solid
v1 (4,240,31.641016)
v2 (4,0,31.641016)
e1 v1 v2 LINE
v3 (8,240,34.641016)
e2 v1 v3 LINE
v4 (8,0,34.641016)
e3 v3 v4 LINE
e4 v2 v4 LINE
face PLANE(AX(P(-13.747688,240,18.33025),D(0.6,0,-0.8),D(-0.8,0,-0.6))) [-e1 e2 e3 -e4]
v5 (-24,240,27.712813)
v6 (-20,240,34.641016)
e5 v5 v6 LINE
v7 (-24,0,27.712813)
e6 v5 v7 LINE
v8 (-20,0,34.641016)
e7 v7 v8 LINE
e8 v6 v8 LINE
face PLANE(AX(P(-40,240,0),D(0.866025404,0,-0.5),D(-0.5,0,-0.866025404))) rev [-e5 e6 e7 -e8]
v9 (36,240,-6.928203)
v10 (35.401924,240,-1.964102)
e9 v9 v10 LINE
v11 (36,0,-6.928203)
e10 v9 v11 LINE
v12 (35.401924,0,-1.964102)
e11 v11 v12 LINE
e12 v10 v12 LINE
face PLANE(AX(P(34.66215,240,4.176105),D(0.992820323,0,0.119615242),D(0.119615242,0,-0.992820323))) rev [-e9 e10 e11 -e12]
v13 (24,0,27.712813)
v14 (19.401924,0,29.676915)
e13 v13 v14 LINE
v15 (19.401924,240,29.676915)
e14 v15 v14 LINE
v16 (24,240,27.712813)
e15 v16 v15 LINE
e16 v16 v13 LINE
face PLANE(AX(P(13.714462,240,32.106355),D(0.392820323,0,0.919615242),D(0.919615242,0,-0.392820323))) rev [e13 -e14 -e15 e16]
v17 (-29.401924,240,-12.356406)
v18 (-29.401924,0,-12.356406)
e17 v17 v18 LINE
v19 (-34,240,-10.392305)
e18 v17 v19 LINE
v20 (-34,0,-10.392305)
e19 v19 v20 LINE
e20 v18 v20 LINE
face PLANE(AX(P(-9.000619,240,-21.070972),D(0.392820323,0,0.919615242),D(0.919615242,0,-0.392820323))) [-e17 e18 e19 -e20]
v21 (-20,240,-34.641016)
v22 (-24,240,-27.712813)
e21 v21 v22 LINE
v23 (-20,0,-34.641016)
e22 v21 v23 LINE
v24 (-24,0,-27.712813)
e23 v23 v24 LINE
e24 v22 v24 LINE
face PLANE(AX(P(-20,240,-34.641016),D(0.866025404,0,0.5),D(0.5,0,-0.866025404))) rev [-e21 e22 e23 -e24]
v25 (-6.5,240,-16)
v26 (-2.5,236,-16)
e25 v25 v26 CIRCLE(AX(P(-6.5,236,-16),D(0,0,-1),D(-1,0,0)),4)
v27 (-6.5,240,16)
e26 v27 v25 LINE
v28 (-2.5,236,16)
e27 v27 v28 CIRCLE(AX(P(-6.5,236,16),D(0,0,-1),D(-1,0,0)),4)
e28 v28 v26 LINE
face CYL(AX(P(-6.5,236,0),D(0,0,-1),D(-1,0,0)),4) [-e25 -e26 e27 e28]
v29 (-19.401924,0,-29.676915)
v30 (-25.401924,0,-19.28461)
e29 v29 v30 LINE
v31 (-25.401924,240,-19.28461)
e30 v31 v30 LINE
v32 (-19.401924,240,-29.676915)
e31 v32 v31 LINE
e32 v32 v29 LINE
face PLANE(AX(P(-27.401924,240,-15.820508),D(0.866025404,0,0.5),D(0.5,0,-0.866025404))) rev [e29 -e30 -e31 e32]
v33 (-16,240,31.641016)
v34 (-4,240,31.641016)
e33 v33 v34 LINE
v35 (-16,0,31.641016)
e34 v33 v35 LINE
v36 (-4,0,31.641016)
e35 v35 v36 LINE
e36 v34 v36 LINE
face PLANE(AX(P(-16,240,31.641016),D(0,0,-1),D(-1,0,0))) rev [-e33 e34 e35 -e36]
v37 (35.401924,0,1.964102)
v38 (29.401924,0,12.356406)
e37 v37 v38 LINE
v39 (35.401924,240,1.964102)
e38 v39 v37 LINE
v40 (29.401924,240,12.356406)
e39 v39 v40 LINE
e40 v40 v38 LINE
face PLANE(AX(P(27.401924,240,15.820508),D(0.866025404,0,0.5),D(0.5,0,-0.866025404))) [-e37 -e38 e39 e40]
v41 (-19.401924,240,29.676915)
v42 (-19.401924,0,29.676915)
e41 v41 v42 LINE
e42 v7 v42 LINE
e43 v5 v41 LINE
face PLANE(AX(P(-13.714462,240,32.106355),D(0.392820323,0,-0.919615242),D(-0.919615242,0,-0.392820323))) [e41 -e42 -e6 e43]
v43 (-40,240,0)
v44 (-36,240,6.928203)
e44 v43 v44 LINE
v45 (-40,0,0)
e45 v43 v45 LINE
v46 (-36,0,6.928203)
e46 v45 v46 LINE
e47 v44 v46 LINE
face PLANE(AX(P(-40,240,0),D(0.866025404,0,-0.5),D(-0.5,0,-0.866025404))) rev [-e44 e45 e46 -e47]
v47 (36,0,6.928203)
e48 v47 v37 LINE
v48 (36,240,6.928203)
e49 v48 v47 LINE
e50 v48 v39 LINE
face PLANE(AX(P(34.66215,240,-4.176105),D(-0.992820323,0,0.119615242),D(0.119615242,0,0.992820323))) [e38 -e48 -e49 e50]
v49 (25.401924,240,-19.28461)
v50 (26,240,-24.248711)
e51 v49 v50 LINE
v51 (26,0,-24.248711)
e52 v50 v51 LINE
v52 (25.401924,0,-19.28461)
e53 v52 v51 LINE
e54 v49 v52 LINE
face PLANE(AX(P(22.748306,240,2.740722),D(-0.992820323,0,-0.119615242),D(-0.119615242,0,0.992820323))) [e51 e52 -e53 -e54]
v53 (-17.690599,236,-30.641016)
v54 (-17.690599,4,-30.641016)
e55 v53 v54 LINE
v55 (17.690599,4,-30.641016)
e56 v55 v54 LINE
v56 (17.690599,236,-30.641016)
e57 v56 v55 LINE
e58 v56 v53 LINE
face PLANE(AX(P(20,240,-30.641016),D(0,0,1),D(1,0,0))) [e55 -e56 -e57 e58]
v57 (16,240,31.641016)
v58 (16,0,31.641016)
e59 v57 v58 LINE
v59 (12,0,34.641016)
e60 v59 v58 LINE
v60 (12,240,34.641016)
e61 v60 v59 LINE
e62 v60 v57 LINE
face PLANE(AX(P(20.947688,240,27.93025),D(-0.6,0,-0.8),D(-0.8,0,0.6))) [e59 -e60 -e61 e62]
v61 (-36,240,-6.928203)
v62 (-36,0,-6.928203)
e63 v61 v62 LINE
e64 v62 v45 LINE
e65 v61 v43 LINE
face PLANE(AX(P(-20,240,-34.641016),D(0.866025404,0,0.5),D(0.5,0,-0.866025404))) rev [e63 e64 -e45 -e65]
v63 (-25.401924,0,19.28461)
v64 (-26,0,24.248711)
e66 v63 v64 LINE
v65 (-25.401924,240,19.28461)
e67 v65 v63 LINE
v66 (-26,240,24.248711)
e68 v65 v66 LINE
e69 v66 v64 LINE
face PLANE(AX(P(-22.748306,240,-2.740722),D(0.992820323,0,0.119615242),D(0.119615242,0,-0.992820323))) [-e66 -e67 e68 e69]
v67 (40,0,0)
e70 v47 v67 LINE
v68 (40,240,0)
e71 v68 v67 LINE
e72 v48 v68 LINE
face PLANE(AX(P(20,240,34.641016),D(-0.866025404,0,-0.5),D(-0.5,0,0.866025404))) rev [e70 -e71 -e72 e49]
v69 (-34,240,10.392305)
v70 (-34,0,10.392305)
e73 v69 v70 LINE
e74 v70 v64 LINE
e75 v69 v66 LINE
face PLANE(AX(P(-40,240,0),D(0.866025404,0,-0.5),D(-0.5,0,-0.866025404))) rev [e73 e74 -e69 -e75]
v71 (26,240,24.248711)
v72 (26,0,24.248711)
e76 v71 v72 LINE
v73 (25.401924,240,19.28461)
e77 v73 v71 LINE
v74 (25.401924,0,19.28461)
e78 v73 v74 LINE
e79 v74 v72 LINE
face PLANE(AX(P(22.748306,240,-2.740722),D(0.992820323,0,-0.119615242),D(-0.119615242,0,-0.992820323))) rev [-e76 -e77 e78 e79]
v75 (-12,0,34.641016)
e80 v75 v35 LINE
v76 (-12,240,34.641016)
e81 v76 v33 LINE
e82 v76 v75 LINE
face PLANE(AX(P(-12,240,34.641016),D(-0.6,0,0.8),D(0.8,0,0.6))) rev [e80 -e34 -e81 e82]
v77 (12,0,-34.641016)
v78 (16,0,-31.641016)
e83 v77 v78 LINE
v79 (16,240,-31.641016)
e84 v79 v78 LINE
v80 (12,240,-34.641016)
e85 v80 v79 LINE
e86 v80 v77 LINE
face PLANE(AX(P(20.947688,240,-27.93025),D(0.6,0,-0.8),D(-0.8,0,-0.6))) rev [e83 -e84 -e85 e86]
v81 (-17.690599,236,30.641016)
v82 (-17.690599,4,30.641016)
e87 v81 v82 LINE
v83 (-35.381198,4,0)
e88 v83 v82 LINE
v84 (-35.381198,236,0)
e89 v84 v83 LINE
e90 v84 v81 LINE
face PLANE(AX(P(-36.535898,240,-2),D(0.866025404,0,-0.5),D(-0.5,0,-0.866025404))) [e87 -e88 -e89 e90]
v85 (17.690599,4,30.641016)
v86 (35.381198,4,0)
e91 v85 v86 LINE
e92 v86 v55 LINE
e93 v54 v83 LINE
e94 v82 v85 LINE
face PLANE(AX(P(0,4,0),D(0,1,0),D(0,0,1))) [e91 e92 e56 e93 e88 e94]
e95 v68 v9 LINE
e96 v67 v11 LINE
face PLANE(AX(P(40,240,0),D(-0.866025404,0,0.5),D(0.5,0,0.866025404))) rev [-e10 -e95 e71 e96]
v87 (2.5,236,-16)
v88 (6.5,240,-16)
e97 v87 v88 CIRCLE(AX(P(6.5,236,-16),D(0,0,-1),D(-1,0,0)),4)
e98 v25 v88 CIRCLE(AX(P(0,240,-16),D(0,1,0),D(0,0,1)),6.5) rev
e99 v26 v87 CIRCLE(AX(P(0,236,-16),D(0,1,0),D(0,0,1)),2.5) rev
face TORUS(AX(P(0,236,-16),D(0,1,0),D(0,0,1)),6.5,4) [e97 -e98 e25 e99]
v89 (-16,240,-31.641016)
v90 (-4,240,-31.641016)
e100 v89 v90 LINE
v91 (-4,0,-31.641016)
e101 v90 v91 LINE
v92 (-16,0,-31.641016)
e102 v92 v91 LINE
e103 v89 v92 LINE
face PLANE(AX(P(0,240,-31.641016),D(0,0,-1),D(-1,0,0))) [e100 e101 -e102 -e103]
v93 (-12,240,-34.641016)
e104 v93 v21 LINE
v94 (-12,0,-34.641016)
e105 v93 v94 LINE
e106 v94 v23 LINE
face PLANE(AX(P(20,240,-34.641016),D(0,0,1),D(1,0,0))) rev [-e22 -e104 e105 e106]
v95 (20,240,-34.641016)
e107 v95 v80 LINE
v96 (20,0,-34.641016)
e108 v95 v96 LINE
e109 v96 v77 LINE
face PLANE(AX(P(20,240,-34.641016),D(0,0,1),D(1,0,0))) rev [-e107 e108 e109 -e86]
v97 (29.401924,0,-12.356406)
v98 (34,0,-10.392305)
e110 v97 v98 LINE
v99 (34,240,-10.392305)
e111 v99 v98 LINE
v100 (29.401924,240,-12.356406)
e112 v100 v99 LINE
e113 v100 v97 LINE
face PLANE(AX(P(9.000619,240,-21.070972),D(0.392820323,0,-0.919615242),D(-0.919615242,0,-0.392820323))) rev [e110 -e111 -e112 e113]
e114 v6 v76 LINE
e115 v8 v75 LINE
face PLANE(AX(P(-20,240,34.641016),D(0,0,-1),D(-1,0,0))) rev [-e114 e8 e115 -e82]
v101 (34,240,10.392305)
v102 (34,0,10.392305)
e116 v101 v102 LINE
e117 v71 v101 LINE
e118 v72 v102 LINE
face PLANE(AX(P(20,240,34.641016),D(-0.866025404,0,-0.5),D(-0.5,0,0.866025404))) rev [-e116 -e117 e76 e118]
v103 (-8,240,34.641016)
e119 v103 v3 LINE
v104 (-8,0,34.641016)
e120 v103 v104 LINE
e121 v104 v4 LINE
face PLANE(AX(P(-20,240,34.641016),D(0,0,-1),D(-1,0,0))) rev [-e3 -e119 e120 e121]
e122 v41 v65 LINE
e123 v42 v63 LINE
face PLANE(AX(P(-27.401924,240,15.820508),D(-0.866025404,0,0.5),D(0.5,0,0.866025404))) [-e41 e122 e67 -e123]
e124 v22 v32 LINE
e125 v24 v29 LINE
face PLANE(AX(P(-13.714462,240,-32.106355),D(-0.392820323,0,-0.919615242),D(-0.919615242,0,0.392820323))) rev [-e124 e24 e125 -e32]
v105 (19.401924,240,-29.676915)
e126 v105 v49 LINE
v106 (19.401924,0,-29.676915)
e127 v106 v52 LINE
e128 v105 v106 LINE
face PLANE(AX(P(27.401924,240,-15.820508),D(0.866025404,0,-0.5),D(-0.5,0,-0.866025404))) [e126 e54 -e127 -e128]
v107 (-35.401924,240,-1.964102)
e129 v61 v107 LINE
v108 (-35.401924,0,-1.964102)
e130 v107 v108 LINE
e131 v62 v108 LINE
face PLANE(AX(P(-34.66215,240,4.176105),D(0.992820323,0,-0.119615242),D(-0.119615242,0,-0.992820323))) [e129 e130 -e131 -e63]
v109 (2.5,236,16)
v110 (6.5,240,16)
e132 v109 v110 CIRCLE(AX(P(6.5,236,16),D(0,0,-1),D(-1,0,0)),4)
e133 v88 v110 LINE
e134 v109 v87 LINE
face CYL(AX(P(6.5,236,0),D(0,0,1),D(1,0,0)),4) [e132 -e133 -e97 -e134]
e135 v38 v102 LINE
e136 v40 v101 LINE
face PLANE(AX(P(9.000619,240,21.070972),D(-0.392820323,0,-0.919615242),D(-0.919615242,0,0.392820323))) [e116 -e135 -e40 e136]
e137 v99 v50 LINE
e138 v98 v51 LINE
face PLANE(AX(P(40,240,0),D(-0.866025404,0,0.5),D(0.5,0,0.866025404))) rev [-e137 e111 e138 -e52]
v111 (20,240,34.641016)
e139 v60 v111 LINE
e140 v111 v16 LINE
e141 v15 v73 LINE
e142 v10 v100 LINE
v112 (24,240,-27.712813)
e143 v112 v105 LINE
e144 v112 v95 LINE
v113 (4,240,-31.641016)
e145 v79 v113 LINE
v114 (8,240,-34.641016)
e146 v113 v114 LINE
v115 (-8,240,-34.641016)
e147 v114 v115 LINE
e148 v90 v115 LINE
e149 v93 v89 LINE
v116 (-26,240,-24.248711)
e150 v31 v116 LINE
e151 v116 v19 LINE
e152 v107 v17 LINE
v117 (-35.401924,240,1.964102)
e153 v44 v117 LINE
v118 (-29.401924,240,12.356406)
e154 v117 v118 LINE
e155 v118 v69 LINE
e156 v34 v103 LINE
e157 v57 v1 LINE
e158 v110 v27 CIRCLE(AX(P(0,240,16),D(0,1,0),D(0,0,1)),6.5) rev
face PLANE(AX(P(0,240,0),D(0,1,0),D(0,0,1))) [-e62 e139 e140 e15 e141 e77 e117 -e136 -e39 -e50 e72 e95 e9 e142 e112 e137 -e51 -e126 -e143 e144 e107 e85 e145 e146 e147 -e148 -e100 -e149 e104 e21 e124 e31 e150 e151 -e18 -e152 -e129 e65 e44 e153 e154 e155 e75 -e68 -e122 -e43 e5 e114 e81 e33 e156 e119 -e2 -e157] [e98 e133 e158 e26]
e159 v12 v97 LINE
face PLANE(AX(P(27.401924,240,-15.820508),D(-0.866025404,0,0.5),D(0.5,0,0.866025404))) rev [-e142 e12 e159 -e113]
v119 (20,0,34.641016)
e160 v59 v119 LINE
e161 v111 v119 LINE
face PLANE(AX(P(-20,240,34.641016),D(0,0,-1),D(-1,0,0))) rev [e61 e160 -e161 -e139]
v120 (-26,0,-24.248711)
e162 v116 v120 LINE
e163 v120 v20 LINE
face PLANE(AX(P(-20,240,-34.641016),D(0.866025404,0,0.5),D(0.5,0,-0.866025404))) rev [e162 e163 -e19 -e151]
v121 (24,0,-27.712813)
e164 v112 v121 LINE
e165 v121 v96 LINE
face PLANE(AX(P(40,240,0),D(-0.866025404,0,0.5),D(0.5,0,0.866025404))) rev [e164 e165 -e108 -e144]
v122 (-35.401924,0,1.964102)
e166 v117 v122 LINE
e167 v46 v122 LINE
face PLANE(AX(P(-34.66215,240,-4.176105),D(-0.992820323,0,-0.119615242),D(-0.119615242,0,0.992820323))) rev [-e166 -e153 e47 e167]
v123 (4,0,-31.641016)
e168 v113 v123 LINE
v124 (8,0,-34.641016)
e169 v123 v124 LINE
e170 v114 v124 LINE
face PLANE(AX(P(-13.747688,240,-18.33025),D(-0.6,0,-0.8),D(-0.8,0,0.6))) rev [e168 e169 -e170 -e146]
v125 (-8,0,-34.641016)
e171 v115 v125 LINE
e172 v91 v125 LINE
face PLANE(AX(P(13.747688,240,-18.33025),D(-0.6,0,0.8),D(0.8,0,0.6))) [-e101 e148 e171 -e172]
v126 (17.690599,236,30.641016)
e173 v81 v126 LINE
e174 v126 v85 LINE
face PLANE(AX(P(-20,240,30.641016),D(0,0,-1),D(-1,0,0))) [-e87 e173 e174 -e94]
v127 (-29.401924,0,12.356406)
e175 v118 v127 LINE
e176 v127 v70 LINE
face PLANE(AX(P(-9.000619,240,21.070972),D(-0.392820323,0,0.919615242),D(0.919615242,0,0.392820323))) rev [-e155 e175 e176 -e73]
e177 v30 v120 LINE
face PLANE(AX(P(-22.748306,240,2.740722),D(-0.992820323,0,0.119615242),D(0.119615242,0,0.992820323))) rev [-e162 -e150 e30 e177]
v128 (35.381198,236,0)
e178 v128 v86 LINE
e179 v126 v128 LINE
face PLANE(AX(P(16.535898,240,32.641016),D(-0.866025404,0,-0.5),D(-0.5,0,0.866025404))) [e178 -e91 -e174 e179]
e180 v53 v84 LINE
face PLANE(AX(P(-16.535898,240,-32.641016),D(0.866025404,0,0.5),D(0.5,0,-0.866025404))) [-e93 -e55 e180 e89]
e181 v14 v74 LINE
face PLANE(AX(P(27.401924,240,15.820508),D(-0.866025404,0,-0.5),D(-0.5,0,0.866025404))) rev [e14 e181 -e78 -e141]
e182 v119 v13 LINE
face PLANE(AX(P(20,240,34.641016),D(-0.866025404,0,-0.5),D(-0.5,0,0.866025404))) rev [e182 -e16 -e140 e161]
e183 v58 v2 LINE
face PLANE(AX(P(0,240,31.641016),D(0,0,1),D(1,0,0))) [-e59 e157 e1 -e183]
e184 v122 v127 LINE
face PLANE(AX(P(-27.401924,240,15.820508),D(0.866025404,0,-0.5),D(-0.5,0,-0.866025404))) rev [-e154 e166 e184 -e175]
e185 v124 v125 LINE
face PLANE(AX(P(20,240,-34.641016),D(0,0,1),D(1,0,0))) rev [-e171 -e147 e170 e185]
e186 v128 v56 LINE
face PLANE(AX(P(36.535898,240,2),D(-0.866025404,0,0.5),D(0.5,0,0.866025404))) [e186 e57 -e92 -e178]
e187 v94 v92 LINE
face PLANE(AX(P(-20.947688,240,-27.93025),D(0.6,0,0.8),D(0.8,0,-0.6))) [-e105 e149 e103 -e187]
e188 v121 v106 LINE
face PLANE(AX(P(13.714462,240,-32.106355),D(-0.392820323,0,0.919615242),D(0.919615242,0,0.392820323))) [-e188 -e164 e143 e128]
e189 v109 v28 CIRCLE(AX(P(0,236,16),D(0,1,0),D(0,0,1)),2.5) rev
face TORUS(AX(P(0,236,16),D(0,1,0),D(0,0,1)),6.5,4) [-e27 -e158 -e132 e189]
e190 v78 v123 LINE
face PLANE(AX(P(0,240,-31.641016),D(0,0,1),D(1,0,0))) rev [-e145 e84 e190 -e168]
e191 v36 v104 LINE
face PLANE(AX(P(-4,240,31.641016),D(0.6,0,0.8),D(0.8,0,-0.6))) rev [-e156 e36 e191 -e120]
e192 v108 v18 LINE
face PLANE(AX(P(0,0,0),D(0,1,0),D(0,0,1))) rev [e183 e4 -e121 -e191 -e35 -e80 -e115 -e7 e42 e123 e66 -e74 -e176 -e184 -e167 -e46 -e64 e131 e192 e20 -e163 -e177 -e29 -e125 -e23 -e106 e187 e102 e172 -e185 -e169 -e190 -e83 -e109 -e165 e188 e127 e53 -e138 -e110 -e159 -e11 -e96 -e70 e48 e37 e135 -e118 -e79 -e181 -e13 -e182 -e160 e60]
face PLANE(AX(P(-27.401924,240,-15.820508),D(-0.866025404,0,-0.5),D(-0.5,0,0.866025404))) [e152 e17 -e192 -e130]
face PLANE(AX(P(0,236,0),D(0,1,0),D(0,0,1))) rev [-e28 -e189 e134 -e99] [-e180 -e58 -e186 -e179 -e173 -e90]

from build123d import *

# Parameters (mm, degrees)
BOSS_EXTRUDE1_DEPTH = 240
SHELL1_T            = 4
CUT_EXTRUDE1_DEPTH  = 246.764114549
CUT_EXTRUDE2_REACH  = 247.764
FILLET1_R           = 4


with BuildPart() as part:
    # Sketch1 → Boss-Extrude1 (new body)
    with BuildSketch(Plane(origin=(0, 0, 0), x_dir=(1, 0, 0), z_dir=(0, 1, 0))):
        Polygon((40, 0), (20, 34.641016151), (-20, 34.641016151), (-40, 0), (-20, -34.641016151), (20, -34.641016151), align=None)
    extrude(amount=BOSS_EXTRUDE1_DEPTH)

    # Shell1 (no face opened: a closed hollow body)
    add(offset(amount=-SHELL1_T, mode=Mode.PRIVATE), mode=Mode.SUBTRACT)

    # Sketch2 → Cut-Extrude1 (cut, through all)
    with BuildSketch(Plane.XZ):
        Polygon((-19.401923789, 29.676914536), (-24, 27.712812921), (-26, 24.248711306), (-25.401923789, 19.284609691), align=None)
        Polygon((16, 31.641016151), (12, 34.641016151), (8, 34.641016151), (4, 31.641016151), align=None)
        Polygon((26, 24.248711306), (24, 27.712812921), (19.401923789, 29.676914536), (25.401923789, 19.284609691), align=None)
        Polygon((35.401923789, 1.964101615), (36, 6.92820323), (34, 10.392304845), (29.401923789, 12.356406461), align=None)
        Polygon((34, -10.392304845), (36, -6.92820323), (35.401923789, -1.964101615), (29.401923789, -12.356406461), align=None)
        Polygon((19.401923789, -29.676914536), (24, -27.712812921), (26, -24.248711306), (25.401923789, -19.284609691), align=None)
        Polygon((8, -34.641016151), (12, -34.641016151), (16, -31.641016151), (4, -31.641016151), align=None)
        Polygon((-16, -31.641016151), (-12, -34.641016151), (-8, -34.641016151), (-4, -31.641016151), align=None)
        Polygon((-26, -24.248711306), (-24, -27.712812921), (-19.401923789, -29.676914536), (-25.401923789, -19.284609691), align=None)
        Polygon((-35.401923789, -1.964101615), (-36, -6.92820323), (-34, -10.392304845), (-29.401923789, -12.356406461), align=None)
        Polygon((-34, 10.392304845), (-36, 6.92820323), (-35.401923789, 1.964101615), (-29.401923789, 12.356406461), align=None)
        Polygon((-16, 31.641016151), (-4, 31.641016151), (-8, 34.641016151), (-12, 34.641016151), align=None)
    extrude(amount=-CUT_EXTRUDE1_DEPTH, mode=Mode.SUBTRACT)

    # Sketch3 → Cut-Extrude2 (cut, up to next)
    with BuildSketch(Plane(origin=(0, 240, 0), x_dir=(1, 0, 0), z_dir=(0, 1, 0)), mode=Mode.PRIVATE) as cut_extrude2_sk1:
        with BuildLine():
            Line((2.5, 16), (2.5, -16))
            ThreePointArc((2.5, -16), (0, -18.5), (-2.5, -16))
            Line((-2.5, -16), (-2.5, 16))
            ThreePointArc((-2.5, 16), (0, 18.5), (2.5, 16))
        make_face()
    cut_extrude2_tool1 = extrude(cut_extrude2_sk1.sketch, amount=-CUT_EXTRUDE2_REACH, mode=Mode.PRIVATE) & part.part
    add(cut_extrude2_tool1.solids().sort_by_distance((0, 240, 0))[0], mode=Mode.SUBTRACT)

    # Fillet1
    fillet1_edges = [part.edges().sort_by_distance(p)[0] for p in [
        (0, 240, -18.5),
        (-2.5, 240, 0),
        (0, 240, 18.5),
        (2.5, 240, 0),
    ]]
    fillet(fillet1_edges, radius=FILLET1_R - 0.0001)  # a hair under: the kernel refuses the full size


solid = part.part
